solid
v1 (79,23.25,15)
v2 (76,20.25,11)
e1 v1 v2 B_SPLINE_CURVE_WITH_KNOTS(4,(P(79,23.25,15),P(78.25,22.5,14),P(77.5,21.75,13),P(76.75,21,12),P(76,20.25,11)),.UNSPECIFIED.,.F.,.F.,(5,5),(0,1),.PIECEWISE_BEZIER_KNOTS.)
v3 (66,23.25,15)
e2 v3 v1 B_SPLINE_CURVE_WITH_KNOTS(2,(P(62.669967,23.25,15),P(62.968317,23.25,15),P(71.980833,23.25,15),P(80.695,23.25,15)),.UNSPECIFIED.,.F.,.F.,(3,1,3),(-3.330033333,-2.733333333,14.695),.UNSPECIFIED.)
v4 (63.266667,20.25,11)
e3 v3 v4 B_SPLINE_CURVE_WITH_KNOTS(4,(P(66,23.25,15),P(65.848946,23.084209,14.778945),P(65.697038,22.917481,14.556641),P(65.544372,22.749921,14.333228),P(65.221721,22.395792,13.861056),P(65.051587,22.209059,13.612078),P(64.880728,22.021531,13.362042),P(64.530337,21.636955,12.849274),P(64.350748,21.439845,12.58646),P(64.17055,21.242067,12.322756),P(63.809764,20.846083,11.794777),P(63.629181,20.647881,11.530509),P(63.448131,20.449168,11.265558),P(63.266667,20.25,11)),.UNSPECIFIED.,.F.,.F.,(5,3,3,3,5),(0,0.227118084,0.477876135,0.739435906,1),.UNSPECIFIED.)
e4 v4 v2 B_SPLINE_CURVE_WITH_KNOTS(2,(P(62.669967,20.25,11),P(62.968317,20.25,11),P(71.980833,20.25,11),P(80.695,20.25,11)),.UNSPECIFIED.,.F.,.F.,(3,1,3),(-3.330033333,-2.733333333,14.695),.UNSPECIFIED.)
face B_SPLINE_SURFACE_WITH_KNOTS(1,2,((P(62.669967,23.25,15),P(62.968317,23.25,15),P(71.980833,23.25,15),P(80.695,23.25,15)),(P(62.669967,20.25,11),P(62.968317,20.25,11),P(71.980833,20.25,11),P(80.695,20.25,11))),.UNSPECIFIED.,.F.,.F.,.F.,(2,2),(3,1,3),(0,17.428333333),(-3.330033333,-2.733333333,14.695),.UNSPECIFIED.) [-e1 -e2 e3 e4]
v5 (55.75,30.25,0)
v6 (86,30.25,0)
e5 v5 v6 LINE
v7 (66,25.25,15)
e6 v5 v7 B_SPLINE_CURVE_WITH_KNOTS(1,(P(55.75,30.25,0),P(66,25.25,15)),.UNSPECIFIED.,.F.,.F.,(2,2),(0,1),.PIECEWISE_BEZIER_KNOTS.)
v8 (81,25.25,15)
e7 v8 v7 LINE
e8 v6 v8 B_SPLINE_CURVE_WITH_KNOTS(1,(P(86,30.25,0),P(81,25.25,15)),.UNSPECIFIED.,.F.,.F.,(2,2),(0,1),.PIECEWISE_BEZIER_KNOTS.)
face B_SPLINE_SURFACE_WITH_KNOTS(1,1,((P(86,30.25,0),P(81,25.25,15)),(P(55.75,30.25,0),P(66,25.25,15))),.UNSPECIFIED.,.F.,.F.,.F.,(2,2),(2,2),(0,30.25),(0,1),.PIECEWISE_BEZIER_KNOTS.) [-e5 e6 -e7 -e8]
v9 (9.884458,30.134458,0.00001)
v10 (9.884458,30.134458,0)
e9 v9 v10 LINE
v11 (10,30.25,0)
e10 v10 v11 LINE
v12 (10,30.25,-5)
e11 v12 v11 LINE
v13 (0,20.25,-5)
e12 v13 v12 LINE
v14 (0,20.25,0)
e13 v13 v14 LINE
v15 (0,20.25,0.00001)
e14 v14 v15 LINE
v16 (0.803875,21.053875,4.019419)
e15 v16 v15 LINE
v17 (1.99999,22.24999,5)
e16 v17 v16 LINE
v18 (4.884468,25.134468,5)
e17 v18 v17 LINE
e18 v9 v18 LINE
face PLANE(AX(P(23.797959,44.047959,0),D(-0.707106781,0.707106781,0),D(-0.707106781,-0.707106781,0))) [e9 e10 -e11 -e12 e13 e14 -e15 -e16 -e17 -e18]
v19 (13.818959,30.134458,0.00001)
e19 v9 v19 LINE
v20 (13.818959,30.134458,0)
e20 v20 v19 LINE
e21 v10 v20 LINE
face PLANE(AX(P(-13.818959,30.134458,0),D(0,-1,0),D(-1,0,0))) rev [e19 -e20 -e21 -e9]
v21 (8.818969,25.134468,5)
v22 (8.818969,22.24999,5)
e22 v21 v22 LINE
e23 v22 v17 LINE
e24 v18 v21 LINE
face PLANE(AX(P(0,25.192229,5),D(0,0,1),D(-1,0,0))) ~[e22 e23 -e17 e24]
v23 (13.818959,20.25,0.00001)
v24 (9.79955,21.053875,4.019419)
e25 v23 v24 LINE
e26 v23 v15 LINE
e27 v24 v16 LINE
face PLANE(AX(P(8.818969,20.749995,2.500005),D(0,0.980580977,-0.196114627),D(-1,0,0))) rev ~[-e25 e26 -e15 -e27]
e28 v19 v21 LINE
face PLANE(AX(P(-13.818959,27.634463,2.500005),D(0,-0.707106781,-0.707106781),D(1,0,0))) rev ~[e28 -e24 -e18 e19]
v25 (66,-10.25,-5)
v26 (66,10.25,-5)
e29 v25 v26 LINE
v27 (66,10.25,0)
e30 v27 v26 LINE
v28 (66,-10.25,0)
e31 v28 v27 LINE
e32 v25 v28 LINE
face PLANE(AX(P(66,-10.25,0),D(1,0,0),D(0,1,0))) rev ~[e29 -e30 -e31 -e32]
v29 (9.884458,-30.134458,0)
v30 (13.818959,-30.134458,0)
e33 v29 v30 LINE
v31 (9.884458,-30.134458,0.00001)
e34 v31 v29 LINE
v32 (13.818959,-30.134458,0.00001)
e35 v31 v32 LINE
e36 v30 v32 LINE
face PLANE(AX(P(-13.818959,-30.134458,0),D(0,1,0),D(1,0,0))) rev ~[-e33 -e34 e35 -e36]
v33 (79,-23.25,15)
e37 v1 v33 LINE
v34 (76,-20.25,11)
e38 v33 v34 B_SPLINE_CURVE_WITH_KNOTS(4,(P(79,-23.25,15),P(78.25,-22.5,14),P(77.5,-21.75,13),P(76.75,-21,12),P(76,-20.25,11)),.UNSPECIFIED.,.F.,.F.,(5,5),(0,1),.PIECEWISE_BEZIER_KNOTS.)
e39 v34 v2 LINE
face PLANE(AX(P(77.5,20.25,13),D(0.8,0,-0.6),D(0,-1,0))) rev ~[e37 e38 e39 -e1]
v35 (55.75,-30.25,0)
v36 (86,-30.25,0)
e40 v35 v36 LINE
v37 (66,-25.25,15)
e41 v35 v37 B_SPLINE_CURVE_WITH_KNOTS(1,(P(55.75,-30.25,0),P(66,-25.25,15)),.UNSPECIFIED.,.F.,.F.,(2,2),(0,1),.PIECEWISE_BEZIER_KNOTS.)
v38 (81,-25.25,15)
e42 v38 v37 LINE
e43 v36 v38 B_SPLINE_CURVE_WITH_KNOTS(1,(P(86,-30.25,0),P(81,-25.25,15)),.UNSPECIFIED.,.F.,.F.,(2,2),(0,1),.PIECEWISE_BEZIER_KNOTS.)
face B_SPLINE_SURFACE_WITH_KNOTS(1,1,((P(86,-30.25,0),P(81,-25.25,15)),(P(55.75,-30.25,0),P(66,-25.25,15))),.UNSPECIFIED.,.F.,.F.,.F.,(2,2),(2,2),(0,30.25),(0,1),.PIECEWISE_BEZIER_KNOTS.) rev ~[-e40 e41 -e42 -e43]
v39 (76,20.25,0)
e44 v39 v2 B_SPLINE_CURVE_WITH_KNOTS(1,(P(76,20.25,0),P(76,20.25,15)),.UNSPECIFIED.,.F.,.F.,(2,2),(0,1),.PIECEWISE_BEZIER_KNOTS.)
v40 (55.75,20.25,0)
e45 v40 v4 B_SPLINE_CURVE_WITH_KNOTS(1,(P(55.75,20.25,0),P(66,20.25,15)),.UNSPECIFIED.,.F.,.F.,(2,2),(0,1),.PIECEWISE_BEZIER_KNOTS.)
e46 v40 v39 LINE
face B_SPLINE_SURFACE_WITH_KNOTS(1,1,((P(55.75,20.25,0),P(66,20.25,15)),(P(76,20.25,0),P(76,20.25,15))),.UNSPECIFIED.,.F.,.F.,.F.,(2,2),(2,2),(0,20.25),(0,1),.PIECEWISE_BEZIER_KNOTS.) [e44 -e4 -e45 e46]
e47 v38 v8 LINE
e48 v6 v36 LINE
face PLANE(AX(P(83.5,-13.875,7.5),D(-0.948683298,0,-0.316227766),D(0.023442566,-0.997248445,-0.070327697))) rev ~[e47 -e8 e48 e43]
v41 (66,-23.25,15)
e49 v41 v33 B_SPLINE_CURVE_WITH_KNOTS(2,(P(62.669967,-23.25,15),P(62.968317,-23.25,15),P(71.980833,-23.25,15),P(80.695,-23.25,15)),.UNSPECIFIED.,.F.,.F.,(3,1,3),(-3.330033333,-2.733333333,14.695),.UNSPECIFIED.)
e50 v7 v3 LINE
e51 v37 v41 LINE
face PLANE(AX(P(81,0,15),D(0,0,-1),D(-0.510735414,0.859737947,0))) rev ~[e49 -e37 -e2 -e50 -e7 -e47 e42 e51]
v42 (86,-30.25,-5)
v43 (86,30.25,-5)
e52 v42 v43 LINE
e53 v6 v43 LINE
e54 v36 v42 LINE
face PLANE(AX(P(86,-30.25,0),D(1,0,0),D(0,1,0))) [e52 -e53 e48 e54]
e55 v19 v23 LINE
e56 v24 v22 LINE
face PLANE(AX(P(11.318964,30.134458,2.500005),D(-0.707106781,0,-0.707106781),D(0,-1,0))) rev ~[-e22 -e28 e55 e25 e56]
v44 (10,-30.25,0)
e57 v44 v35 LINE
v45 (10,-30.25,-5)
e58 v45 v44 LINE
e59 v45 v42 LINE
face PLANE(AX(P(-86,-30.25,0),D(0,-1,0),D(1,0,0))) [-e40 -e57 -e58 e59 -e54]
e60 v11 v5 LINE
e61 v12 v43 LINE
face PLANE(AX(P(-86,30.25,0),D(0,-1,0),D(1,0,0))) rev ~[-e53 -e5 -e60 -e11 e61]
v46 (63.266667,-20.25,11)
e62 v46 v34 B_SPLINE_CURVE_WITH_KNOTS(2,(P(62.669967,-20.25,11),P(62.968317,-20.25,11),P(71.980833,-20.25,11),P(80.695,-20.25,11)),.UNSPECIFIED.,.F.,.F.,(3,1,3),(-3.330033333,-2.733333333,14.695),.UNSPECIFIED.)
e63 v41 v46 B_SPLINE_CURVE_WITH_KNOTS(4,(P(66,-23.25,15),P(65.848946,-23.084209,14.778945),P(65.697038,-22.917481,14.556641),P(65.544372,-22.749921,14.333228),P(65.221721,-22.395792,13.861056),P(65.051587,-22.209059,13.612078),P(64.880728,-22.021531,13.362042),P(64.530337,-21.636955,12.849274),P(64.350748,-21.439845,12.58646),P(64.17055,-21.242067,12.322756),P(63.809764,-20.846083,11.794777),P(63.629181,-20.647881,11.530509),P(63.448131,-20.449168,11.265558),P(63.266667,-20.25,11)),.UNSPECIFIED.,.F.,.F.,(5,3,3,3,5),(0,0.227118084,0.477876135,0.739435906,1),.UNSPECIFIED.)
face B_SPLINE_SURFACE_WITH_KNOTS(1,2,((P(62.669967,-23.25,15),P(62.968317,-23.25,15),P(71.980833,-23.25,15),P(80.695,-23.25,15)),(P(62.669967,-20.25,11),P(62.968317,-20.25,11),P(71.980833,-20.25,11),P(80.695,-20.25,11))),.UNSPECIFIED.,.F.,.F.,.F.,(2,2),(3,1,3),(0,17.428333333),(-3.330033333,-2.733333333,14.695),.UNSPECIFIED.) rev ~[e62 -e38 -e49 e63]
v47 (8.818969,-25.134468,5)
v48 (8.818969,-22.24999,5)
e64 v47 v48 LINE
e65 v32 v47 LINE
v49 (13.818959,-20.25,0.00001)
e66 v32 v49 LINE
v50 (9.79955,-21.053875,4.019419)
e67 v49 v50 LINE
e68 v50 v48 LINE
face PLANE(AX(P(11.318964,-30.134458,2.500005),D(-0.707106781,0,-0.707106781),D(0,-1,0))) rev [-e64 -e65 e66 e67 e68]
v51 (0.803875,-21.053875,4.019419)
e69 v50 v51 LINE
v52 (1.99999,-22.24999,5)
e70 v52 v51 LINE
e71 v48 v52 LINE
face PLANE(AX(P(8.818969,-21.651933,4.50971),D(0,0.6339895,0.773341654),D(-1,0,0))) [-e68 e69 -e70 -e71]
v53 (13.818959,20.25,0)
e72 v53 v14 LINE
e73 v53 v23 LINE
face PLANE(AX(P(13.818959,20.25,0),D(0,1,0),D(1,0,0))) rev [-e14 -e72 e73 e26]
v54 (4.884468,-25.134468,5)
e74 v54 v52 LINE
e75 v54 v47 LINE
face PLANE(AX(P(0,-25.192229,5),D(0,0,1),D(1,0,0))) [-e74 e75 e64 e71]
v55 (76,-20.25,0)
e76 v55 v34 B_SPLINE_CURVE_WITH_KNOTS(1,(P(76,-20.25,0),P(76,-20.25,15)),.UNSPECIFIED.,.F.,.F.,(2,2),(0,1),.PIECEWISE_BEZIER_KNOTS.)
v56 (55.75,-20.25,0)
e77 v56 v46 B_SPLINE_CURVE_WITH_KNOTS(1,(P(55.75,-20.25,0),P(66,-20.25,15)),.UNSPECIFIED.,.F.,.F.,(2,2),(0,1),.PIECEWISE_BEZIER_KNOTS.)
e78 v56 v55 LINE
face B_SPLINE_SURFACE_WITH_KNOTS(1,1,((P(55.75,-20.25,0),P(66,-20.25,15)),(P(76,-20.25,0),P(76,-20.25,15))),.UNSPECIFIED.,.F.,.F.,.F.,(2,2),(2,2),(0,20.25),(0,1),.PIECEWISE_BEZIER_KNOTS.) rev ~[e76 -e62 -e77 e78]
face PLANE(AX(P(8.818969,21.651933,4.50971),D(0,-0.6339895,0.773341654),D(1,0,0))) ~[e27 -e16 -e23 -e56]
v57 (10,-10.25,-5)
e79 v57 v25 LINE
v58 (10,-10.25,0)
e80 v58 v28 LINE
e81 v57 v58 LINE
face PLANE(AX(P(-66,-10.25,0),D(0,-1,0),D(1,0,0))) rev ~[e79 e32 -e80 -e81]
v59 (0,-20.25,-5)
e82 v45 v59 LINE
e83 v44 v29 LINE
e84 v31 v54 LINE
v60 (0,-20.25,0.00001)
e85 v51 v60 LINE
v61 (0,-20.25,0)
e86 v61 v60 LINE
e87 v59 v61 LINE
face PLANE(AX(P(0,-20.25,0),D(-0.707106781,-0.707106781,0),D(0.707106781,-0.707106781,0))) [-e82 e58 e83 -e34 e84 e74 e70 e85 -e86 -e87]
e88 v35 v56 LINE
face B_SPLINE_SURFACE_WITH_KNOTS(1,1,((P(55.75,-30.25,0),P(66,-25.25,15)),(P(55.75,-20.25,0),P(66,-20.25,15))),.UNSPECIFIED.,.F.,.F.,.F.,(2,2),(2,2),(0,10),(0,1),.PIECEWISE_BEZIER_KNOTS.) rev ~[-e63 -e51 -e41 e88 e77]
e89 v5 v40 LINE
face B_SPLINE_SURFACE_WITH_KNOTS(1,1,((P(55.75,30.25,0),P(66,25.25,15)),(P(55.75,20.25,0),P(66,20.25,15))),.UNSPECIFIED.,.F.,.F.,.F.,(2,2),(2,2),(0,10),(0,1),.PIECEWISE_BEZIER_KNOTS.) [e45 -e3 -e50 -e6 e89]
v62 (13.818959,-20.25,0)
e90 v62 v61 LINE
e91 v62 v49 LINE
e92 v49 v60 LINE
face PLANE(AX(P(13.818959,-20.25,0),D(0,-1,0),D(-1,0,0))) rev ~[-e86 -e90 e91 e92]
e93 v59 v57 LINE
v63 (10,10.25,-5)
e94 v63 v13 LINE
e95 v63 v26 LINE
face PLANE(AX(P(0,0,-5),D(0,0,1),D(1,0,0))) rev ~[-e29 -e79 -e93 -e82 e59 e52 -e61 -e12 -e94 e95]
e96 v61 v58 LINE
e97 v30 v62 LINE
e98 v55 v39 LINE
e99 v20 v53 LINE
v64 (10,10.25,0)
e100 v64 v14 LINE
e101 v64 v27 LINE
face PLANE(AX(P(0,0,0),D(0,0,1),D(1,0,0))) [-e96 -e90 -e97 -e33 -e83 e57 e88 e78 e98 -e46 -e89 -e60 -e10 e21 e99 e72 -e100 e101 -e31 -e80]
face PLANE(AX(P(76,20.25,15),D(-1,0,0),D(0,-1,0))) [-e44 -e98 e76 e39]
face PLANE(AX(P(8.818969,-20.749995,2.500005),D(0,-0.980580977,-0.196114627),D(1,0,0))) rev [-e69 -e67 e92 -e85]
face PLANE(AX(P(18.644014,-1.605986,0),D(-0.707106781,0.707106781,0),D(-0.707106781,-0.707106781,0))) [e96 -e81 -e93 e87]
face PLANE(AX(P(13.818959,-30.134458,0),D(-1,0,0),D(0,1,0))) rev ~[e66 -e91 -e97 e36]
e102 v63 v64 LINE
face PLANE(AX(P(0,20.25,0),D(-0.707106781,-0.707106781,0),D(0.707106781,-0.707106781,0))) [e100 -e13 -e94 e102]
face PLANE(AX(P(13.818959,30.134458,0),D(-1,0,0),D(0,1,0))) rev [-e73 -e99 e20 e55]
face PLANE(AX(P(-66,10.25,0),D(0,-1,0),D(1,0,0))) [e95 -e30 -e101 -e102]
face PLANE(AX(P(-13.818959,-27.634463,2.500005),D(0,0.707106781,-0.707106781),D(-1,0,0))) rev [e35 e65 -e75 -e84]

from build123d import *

# Parameters (mm, degrees)
F0_W           = 172
F0_H           = 60.5
F4_DEPTH       = 5
F6_SIZE2       = 4
F6_SIZE        = 3
F9_DEPTH       = 5
F10_SIZE       = 4.99999
F11_SIZE2      = 0.99999
F11_SIZE       = 4.99999
F12_SIZE       = 1
F14_W          = 132
F14_H          = 20.5
F15_DEPTH      = 12.5
F17_DEPTH      = 25
F17_DEPTH_BACK = 25


# Not quite as in the source:
# - a fillet or chamfer is up to 0.001 mm smaller than in the source, because OpenCascade refuses the exact size


with BuildPart() as f4:
    # F0 (on Top) → F4 (new body)
    with BuildSketch(Plane.XY):
        Rectangle(F0_W, F0_H)
    extrude(amount=-F4_DEPTH)

    # F3 (on Top) → F5 section 0
    with BuildSketch(Plane.XY):
        Polygon((-86, 0), (-86, -30.25), (-55.75, -30.25), (-55.75, -20.25), (-76, -20.25), (-76, 0), align=None)
    # F2 (on offset) → F5 section 1
    with BuildSketch(Plane.XY.offset(15)):
        Polygon((-76, -20.25), (-76, 0), (-81, 0), (-81, -25.25), (-66, -25.25), (-66, -20.25), align=None)
    loft()

    # F6
    f6_edges = [f4.edges().sort_by_distance(p)[0] for p in [
        (-76, -10.125, 15),
        (-71, -20.25, 15),
    ]]
    chamfer(f6_edges, length=F6_SIZE, length2=F6_SIZE2)

    # F7: F4 across plane


with BuildPart() as f4_1:
    add(f4.part)
    add(f4.part.mirror(Plane.YZ))

    # F8 (on face) → F9 (join)
    with BuildSketch(Plane.XY):
        Polygon((13.8189587742, -20.25), (0, -20.25), (-13.8189587742, -20.25), (-13.8189587742, -30.1344580948), (0, -30.1344580948), (13.8189587742, -30.1344580948), align=None)
    extrude(amount=F9_DEPTH)

    # F10 (size 5 in the source; OpenCascade refuses exactly that, so slightly less here)
    f10_edges = [f4_1.edges().sort_by_distance(p)[0] for p in [
        (13.818959, -25.192229, 5),
        (0, -30.134458, 5),
        (-13.818959, -25.192229, 5),
    ]]
    chamfer(f10_edges, length=F10_SIZE)

    # F11 (size 5 and 1 in the source; OpenCascade refuses exactly that, so slightly less here)
    f11_edges = [f4_1.edges().sort_by_distance(p)[0] for p in [
        (0, -20.25, 5),
    ]]
    f11_side = f4_1.faces().sort_by_distance((0, -20.25, 2.315943))[0]
    chamfer(f11_edges, length=F11_SIZE, length2=F11_SIZE2, reference=f11_side)

    # F12
    f12_edges = [f4_1.edges().sort_by_distance(p)[0] for p in [
        (0, -21.24999, 5),
    ]]
    chamfer(f12_edges, length=F12_SIZE)

    # F13: F4 across plane


with BuildPart() as f4_2:
    add(f4_1.part)
    add(f4_1.part.mirror(Plane.XZ))

    # F14 (on Top) → F15 (cut, symmetric)
    with BuildSketch(Plane.XY):
        Rectangle(F14_W, F14_H)
    extrude(amount=F15_DEPTH, both=True, mode=Mode.SUBTRACT)


with BuildPart() as f17:
    # F16 (on Top) → F17 (new body, two sides)
    with BuildSketch(Plane.XY) as f17_sk:
        Polygon((23.7979591321, 44.0479591321), (0, 20.25), (18.644013716, 1.605986284), (18.644013716, -1.605986284), (0, -20.25), (26.894013716, -47.144013716), (91.0670285058, -47.144013716), (91.0670285058, 44.0479591321), align=None)
    extrude(amount=F17_DEPTH)
    extrude(f17_sk.sketch, amount=-F17_DEPTH_BACK)

    # F18: intersect F4
    add(f4_2.part, mode=Mode.INTERSECT)


solid = f17.part
